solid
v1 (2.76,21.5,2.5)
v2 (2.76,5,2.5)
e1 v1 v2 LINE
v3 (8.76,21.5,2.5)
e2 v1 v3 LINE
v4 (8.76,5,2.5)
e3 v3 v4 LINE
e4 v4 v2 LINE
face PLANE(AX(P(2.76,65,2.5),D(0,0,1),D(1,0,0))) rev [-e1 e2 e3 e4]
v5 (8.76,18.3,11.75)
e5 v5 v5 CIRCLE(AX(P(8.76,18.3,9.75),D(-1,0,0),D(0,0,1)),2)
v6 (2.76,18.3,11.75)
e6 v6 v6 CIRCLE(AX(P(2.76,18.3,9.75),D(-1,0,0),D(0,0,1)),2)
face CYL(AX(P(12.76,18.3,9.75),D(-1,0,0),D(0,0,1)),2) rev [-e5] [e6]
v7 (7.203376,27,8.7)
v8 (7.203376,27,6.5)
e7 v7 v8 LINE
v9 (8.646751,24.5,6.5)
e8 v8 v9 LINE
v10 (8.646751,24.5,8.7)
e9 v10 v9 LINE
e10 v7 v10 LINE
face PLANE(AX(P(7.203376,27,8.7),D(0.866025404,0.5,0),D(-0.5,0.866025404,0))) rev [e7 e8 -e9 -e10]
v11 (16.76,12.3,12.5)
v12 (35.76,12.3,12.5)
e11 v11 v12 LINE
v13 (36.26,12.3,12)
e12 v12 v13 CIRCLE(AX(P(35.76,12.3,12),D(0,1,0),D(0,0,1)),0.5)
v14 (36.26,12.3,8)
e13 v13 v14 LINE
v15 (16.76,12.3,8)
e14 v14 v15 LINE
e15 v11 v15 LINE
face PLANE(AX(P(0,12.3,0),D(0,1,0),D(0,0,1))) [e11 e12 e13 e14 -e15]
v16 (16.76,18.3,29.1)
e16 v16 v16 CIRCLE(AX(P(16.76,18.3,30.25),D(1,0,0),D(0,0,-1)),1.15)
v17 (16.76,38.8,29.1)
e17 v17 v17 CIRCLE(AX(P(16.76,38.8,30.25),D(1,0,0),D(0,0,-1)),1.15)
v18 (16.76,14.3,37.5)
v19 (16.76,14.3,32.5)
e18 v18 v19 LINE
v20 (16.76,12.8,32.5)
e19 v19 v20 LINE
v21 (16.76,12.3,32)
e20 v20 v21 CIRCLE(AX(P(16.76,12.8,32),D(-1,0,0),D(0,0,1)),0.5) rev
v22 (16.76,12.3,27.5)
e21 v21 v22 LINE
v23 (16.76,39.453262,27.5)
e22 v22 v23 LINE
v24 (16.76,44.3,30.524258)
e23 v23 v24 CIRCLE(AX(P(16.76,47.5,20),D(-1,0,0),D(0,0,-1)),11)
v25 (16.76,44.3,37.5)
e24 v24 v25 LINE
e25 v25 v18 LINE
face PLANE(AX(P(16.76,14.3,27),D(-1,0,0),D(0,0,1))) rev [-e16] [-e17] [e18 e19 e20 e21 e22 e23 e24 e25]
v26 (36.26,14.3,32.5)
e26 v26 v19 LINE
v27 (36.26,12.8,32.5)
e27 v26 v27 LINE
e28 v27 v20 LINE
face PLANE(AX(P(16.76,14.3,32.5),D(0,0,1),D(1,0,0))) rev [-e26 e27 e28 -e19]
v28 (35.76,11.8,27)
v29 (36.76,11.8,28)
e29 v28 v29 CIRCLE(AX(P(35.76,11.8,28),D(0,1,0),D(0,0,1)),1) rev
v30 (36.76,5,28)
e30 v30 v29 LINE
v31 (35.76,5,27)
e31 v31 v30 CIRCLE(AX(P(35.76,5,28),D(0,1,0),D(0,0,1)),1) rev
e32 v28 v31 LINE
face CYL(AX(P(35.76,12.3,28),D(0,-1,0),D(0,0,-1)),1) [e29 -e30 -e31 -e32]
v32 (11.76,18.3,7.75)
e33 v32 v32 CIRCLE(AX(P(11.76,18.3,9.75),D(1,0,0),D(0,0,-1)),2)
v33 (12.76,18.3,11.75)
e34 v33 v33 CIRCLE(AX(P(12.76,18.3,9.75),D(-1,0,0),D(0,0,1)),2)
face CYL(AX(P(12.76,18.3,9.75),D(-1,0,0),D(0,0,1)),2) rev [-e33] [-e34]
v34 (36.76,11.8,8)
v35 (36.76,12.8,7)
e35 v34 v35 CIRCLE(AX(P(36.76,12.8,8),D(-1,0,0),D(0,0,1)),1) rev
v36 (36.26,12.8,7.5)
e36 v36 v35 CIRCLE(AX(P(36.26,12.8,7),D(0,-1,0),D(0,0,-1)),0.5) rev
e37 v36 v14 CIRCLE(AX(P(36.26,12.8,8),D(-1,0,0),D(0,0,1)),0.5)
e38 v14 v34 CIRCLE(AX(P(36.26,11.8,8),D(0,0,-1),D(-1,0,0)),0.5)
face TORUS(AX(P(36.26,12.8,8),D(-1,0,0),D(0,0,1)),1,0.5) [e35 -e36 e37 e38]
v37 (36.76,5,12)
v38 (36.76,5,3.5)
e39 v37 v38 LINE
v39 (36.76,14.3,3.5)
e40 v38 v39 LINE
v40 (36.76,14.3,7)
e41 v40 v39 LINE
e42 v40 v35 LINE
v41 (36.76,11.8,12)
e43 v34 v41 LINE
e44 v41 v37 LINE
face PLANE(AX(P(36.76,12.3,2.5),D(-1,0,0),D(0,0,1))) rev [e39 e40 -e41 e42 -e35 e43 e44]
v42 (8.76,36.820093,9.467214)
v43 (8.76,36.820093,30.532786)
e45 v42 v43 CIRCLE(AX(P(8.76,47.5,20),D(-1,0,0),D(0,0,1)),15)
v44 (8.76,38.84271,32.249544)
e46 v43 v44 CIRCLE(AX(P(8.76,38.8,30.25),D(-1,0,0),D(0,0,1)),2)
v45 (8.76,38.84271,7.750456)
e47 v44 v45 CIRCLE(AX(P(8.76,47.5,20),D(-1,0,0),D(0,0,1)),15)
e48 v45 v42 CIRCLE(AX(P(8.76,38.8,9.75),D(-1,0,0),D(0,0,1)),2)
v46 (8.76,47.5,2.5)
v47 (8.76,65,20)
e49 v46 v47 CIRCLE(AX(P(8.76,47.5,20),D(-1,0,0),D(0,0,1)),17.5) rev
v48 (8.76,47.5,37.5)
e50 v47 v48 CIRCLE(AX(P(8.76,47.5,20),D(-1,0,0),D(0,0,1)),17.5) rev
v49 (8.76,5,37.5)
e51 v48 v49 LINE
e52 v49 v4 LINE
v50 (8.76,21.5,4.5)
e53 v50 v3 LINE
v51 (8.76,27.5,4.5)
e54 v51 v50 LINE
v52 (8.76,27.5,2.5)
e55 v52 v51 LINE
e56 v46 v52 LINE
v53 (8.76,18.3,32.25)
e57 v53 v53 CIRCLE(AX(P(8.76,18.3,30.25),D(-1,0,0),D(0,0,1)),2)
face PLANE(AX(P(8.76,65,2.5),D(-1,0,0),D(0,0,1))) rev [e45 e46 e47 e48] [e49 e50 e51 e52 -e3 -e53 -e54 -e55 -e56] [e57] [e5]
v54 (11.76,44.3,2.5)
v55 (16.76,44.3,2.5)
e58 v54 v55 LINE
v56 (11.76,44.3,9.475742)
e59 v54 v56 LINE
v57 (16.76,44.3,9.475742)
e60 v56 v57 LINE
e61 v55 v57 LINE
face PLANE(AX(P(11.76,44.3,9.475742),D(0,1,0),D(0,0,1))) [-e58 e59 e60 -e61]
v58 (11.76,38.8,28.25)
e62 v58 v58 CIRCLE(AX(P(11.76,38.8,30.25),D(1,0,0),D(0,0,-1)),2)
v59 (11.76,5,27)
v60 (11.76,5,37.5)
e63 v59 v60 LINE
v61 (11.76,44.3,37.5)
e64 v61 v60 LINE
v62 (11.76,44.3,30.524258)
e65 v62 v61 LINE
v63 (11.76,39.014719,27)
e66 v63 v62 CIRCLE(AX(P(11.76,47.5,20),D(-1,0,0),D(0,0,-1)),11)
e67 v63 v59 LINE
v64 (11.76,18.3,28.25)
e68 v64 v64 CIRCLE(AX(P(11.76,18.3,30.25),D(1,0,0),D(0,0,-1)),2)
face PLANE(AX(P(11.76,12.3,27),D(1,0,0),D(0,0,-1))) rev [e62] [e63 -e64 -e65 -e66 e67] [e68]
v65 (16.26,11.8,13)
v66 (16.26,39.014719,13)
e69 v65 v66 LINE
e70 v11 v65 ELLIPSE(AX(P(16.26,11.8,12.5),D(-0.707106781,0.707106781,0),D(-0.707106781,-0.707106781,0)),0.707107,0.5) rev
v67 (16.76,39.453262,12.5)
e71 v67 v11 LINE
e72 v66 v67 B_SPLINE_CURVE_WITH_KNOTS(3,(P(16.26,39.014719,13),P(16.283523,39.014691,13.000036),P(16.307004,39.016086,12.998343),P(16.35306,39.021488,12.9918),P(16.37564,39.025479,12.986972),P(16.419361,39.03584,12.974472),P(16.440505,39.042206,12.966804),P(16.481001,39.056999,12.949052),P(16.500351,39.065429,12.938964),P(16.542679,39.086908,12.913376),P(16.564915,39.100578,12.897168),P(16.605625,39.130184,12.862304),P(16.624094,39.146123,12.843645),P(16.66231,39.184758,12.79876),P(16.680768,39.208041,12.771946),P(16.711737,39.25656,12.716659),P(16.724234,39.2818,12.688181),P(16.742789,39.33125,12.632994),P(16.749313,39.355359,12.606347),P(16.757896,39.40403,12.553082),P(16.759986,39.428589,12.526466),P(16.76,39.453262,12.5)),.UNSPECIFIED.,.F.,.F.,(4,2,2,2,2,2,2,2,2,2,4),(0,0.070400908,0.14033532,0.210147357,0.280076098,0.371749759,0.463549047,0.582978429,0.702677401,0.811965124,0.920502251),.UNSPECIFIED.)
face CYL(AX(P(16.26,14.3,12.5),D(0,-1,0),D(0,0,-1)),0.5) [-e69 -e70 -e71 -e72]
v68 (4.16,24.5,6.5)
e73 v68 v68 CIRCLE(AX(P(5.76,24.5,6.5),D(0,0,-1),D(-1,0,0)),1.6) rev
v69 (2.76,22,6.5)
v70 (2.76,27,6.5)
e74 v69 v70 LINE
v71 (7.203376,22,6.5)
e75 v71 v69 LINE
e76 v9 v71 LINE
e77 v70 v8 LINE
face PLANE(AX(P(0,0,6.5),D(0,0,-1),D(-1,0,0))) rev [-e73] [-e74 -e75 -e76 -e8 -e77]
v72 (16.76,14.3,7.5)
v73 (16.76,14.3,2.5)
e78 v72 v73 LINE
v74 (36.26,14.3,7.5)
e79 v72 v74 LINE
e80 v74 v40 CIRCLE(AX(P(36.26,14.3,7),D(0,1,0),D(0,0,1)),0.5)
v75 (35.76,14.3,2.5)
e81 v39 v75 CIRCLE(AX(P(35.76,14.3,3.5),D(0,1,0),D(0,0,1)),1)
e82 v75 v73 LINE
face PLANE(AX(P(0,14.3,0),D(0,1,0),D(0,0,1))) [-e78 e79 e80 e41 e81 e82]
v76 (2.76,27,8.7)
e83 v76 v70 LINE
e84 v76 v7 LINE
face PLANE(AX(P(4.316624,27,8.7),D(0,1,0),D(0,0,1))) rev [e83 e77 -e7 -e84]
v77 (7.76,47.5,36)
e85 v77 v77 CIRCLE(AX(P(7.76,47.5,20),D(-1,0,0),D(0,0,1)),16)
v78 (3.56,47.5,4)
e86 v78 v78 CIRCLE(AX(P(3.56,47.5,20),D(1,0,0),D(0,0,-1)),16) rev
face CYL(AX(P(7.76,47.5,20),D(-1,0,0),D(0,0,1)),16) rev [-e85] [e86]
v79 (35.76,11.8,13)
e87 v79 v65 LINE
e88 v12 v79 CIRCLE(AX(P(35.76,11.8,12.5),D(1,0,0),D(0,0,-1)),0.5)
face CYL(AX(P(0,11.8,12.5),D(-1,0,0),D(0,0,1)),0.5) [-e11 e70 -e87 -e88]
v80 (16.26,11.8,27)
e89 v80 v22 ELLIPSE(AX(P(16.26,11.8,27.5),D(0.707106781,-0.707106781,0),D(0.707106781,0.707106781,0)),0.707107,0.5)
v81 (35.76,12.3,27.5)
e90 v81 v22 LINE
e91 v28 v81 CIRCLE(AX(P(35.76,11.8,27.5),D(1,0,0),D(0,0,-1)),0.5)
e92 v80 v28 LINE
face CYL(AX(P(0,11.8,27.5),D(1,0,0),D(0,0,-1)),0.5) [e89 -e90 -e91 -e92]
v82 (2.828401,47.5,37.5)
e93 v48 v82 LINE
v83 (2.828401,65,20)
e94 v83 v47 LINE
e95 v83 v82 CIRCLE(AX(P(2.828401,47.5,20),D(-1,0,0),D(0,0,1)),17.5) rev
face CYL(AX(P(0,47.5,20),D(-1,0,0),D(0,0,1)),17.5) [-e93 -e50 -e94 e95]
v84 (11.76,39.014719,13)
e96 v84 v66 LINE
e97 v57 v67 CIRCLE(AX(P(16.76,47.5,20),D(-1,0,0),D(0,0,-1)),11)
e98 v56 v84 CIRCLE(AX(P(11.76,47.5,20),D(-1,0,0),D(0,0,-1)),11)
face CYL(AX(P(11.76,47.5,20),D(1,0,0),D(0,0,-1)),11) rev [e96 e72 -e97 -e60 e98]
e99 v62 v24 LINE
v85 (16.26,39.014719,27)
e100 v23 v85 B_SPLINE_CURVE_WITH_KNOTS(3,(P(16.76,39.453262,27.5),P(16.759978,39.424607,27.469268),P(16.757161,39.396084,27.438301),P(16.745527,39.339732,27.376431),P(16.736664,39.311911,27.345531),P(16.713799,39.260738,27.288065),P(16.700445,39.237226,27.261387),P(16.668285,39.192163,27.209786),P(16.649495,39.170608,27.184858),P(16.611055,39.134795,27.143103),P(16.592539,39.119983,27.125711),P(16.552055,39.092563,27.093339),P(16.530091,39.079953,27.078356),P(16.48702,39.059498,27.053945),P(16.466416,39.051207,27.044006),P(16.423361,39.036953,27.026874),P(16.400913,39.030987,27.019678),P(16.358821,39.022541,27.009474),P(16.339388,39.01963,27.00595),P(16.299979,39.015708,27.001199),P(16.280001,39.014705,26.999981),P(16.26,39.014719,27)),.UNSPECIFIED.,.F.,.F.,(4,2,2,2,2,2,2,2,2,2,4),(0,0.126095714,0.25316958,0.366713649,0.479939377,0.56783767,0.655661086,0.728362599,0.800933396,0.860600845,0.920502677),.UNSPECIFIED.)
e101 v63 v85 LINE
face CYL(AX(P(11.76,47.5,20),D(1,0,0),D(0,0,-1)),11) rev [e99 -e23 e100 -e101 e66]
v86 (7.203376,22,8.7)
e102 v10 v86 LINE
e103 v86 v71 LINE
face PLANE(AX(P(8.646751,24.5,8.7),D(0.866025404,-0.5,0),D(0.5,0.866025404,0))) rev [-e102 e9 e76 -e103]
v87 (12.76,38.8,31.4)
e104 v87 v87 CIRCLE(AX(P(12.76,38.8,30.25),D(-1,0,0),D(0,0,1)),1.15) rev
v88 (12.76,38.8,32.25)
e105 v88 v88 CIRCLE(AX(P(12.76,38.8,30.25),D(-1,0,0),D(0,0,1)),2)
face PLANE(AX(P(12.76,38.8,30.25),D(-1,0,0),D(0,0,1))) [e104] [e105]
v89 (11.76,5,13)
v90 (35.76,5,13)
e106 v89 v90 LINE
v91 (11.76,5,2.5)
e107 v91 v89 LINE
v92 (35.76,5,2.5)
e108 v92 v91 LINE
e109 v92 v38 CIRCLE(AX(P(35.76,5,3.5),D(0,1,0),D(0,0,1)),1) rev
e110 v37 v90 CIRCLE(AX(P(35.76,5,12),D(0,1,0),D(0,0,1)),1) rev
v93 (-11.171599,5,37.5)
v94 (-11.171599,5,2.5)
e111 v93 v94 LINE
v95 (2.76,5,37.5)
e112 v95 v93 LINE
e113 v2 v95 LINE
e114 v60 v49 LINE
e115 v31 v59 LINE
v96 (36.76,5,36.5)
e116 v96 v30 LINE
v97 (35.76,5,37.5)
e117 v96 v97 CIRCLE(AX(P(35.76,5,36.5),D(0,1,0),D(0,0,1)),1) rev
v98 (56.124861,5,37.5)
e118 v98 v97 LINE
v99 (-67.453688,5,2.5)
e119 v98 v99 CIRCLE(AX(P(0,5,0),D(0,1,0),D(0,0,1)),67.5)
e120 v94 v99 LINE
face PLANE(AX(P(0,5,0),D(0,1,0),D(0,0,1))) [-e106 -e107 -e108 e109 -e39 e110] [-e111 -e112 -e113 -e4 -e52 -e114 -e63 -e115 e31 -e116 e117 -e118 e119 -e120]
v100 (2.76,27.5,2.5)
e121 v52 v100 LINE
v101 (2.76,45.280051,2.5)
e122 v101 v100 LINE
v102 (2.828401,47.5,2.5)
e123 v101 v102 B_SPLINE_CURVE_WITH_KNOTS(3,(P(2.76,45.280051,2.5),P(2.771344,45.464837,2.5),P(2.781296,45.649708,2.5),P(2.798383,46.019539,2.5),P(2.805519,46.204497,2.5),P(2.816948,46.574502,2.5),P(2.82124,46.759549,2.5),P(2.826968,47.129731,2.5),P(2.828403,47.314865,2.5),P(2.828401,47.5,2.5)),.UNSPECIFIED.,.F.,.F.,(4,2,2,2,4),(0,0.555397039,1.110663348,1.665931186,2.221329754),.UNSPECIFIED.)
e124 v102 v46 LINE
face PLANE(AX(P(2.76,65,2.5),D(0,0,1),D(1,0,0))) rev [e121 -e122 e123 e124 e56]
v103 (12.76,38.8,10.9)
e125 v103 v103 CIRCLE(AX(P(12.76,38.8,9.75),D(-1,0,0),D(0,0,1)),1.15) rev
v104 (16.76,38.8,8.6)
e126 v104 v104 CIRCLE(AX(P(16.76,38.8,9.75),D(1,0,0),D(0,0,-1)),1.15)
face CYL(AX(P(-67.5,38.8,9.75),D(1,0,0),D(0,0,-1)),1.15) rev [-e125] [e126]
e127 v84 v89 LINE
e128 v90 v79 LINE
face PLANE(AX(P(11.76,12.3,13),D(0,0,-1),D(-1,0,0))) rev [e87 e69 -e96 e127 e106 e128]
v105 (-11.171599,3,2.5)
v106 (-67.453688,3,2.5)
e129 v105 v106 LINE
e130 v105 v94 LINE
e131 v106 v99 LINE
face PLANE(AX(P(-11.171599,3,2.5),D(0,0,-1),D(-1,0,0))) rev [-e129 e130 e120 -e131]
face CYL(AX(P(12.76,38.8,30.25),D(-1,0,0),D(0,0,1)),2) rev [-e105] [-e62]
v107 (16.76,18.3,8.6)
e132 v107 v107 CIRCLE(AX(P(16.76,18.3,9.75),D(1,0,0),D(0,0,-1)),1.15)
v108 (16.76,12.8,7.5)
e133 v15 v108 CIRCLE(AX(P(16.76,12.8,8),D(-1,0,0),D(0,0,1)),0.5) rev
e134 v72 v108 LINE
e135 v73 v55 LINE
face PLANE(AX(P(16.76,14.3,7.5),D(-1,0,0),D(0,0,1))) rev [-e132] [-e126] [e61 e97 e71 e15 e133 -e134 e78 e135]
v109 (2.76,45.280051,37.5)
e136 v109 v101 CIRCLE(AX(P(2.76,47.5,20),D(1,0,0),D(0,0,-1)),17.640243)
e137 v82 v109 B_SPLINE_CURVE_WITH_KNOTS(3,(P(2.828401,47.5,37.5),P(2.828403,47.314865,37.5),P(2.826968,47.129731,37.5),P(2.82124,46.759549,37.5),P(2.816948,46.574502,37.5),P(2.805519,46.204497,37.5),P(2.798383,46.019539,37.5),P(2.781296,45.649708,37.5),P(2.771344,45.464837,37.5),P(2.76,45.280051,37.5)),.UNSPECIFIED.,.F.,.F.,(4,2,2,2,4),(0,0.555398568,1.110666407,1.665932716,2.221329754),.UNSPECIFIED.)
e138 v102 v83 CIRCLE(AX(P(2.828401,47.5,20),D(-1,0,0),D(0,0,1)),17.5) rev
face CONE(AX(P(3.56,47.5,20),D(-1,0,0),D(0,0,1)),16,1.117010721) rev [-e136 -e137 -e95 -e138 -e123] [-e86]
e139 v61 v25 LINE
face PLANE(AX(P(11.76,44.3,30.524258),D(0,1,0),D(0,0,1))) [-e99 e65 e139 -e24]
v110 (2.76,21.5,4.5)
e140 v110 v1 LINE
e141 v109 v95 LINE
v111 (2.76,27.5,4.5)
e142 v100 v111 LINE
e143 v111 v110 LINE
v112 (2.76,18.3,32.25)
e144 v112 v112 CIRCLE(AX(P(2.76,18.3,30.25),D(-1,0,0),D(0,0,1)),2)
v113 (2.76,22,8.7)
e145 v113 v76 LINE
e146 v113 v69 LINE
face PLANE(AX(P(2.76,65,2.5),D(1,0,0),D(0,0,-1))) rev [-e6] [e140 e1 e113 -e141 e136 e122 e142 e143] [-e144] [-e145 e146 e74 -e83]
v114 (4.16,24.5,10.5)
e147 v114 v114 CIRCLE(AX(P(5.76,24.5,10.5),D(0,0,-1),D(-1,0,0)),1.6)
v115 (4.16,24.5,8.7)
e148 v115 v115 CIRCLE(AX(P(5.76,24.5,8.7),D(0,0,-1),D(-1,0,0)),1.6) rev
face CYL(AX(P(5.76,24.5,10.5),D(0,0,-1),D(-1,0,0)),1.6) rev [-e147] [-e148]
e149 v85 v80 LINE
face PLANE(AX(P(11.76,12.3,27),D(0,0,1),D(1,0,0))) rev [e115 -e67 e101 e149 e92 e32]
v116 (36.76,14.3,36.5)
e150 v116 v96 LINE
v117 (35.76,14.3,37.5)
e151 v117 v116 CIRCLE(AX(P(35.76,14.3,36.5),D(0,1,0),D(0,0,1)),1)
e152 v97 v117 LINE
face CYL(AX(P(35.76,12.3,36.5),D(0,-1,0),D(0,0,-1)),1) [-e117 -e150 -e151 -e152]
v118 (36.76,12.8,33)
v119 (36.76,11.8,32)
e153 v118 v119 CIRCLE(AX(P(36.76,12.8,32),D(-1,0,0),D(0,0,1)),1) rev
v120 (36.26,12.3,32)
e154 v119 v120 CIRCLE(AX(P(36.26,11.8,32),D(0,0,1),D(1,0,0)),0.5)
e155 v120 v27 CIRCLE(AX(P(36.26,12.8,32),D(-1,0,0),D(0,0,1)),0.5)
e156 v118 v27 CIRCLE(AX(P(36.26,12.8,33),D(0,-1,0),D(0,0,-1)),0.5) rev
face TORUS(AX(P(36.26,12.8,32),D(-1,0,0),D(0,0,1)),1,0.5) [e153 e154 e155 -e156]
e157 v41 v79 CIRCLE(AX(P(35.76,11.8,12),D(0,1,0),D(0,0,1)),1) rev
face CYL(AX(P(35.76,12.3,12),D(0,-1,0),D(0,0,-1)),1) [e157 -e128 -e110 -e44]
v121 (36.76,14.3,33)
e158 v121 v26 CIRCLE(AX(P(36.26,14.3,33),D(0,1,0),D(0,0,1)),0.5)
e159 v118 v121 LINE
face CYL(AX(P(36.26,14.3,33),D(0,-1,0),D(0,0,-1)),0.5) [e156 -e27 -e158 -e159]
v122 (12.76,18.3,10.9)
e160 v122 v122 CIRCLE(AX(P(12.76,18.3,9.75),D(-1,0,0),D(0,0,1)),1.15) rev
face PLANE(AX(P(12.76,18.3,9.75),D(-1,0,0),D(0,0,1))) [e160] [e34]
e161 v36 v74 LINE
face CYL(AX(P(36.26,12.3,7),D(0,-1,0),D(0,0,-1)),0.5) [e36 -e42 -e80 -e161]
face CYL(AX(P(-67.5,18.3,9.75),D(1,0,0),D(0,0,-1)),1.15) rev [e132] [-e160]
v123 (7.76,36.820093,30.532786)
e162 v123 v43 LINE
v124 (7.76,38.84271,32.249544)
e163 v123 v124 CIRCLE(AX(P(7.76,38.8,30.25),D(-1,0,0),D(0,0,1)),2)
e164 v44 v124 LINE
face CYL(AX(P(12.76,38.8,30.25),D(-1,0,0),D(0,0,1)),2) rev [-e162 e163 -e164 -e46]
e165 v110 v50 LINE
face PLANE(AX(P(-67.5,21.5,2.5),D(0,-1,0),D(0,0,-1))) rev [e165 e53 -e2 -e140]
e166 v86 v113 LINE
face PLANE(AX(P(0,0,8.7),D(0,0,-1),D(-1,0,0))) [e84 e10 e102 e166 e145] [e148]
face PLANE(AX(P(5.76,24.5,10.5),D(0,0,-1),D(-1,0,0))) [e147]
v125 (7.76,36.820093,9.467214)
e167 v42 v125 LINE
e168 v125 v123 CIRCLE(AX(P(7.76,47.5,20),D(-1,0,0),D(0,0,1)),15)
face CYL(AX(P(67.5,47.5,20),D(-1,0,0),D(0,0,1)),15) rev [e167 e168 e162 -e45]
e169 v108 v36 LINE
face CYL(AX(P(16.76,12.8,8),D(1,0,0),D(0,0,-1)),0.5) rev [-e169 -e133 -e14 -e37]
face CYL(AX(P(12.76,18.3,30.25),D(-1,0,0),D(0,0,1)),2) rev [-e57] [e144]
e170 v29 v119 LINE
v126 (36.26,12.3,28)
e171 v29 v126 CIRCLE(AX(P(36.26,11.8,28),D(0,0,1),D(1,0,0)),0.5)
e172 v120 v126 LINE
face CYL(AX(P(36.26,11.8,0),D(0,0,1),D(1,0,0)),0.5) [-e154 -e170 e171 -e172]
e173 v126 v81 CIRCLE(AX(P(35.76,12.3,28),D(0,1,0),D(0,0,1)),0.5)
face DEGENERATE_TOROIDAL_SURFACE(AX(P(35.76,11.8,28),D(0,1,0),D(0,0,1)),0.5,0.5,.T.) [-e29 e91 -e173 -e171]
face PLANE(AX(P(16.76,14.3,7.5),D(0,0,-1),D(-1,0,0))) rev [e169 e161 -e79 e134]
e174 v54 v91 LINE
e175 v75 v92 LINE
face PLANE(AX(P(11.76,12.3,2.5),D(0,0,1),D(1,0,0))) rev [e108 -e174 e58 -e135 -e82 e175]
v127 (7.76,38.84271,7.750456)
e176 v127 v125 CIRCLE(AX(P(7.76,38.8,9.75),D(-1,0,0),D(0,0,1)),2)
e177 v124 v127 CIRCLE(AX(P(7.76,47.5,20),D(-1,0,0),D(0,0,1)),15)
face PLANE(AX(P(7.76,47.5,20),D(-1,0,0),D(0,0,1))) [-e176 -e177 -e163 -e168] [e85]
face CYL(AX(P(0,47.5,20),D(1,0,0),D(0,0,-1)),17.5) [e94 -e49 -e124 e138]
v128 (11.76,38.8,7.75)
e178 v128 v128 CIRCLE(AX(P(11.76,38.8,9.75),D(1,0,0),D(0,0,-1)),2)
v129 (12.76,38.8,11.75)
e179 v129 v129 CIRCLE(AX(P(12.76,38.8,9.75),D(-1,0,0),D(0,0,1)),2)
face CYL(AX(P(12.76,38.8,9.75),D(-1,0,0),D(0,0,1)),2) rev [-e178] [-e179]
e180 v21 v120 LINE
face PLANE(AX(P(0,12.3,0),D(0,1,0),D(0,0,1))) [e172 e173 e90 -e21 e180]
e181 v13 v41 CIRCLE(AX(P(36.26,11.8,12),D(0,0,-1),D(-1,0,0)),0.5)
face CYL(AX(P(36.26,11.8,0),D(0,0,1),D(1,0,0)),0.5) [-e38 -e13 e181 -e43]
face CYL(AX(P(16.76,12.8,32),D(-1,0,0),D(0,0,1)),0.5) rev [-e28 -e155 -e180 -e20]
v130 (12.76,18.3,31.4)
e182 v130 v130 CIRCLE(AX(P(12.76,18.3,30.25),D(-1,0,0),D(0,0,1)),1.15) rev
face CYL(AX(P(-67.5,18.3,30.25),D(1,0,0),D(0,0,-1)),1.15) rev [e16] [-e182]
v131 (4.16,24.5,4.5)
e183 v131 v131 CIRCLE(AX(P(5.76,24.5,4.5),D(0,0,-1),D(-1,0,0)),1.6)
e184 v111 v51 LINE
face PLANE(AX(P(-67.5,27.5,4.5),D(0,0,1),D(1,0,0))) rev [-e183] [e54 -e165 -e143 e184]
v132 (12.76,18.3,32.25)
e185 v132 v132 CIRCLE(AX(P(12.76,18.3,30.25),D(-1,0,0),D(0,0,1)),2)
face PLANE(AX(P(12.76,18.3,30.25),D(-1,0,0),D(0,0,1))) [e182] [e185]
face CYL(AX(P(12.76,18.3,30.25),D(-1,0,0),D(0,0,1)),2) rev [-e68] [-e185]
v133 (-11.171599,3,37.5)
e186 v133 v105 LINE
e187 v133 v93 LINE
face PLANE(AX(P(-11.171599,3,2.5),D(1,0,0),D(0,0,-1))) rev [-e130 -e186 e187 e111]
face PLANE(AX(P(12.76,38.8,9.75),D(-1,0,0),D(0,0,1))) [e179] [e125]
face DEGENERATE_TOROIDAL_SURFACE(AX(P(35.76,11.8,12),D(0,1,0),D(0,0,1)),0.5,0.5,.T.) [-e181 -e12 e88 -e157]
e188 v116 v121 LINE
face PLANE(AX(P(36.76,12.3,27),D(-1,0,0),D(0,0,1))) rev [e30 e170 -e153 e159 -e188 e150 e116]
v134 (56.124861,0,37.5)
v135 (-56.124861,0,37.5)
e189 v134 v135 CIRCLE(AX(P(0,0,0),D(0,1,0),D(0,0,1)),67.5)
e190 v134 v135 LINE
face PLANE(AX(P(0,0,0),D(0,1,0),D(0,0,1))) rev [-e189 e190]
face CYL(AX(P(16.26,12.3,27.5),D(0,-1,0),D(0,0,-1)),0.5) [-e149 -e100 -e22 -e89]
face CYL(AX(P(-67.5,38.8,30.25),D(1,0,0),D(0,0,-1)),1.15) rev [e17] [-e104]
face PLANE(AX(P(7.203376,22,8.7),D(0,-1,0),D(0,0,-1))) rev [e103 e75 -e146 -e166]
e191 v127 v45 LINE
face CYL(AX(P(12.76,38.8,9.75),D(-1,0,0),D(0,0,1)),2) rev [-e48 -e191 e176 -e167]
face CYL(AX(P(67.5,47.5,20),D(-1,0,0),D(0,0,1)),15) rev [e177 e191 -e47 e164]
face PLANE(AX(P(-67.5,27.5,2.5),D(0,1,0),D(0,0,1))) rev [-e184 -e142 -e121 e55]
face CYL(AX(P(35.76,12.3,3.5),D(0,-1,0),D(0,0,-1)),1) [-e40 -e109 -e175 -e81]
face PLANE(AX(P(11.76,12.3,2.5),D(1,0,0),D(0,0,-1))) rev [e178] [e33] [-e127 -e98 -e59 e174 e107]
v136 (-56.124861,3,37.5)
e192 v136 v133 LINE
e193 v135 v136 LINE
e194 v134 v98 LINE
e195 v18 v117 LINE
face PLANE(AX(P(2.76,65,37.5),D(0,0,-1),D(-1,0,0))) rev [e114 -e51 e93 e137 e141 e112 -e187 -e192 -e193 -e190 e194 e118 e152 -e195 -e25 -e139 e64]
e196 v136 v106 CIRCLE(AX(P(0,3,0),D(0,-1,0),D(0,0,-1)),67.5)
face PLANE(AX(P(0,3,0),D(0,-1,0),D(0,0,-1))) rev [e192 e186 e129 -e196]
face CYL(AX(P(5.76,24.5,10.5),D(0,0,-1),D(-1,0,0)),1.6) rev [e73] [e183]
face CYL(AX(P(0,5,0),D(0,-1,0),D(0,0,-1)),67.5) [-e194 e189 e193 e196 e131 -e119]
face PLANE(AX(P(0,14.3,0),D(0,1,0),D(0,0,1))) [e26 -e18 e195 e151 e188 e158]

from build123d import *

# Parameters (mm, degrees)
SKETCH_1_R           = 67.5
EXTRUDE_1_DEPTH      = 5
SKETCH_2_W           = 6
SKETCH_2_H           = 35
EXTRUDE_2_DEPTH      = 60
FILLET_1_R           = 17.5
SKETCH_3_R           = 16
CUT_EXTRUDE_1_DEPTH  = 5
CHAMFER_1_SIZE       = 1.640243073
CHAMFER_1_SIZE_2     = 0.8
SKETCH_4_R           = 15
CUT_EXTRUDE_2_DEPTH  = 121.188675061
SKETCH_6_W           = 2
SKETCH_6_H           = 6
CUT_EXTRUDE_3_DEPTH  = 121.817372977
SKETCH_8_R           = 1.6
CUT_EXTRUDE_5_DEPTH  = 6
CUT_EXTRUDE_START    = -2
CUT_EXTRUDE_8_DEPTH  = 2.2
SKETCH_11_W          = 25
SKETCH_11_H          = 10.5
EXTRUDE_4_DEPTH      = 7.3
EXTRUDE_5_DEPTH      = 2
FILLET_3_R           = 1
EXTRUDE_6_DEPTH      = 5
SKETCH_14_R          = 1.15
CUT_EXTRUDE_10_DEPTH = 127.019830237
FILLET_2_R           = 0.5
SKETCH_15_R          = 2
CUT_EXTRUDE_11_DEPTH = 10
SKETCH_16_W          = 56.328401117
SKETCH_16_H          = 65
CUT_EXTRUDE_12_DEPTH = 2
SKETCH_17_W          = 112.249721604
SKETCH_17_H          = 30
CUT_EXTRUDE_13_DEPTH = 113.749722891


# Some blends are built 0.0001 mm under size
with BuildPart() as part:
    # 스케치1 → 보스-돌출1 (new body)
    with BuildSketch(Plane(origin=(0, 0, 0), x_dir=(1, 0, 0), z_dir=(0, 1, 0))):
        with Locations(Location((0, 0, 0), (0, 0, 270))):
            Circle(SKETCH_1_R)
    extrude(amount=EXTRUDE_1_DEPTH)

    # 스케치2 → 보스-돌출2 (add)
    with BuildSketch(Plane(origin=(0, 5, 0), x_dir=(1, 0, 0), z_dir=(0, 1, 0))):
        with Locations((5.76, -20)):
            Rectangle(SKETCH_2_W, SKETCH_2_H)
    extrude(amount=EXTRUDE_2_DEPTH)

    # 필렛1
    fillet_1_edges = [part.edges().sort_by_distance(p)[0] for p in [
        (5.76, 65, 2.5),
        (5.76, 65, 37.5),
    ]]
    fillet(fillet_1_edges, radius=FILLET_1_R - 0.0001)  # a hair under: the kernel refuses the full size

    # 스케치3 → 컷-돌출1 (cut)
    with BuildSketch(Plane.ZY.offset(-2.76)):
        with Locations((20, 47.5)):
            Circle(SKETCH_3_R)
    extrude(amount=-CUT_EXTRUDE_1_DEPTH, mode=Mode.SUBTRACT)

    # 모따기1
    # the kernel refuses this chamfer: 1.640243073, 0.8 mm, written as the material it takes off along each edge
    with BuildSketch(Plane(origin=(2.76, 47.5, 20), x_dir=(0, 0, 1), z_dir=(0, -1, 0))) as chamfer_1_piece_1:
        Polygon((16 + CHAMFER_1_SIZE, 0), (16, -CHAMFER_1_SIZE_2), (16, 0), align=None)
    revolve(axis=Axis((2.76, 47.5, 20), (-1, 0, 0)), mode=Mode.SUBTRACT)

    # 스케치4 → 컷-돌출2 (cut, through all)
    with BuildSketch(Plane.ZY.offset(-7.76)):
        with Locations((20, 47.5)):
            Circle(SKETCH_4_R)
    extrude(amount=-CUT_EXTRUDE_2_DEPTH, mode=Mode.SUBTRACT)

    # 스케치6 → 컷-돌출3 (cut, through all)
    with BuildSketch(Plane(origin=(8.76, 0, 0), x_dir=(0, 0, -1), z_dir=(1, 0, 0))):
        with Locations((-3.5, 24.5)):
            Rectangle(SKETCH_6_W, SKETCH_6_H)
    extrude(amount=-CUT_EXTRUDE_3_DEPTH, mode=Mode.SUBTRACT)

    # 스케치8 → 컷-돌출5 (cut)
    with BuildSketch(Plane(origin=(0, 0, 4.5), x_dir=(-1, 0, 0), z_dir=(0, 0, -1))):
        with Locations((-5.76, 24.5)):
            Circle(SKETCH_8_R)
    extrude(amount=-CUT_EXTRUDE_5_DEPTH, mode=Mode.SUBTRACT)

    # 스케치9 → 컷-돌출8 (cut)
    with BuildSketch(Plane(origin=(0, 0, 4.5), x_dir=(-1, 0, 0), z_dir=(0, 0, -1)).offset(CUT_EXTRUDE_START)):
        Polygon((-4.316624327, 27), (-7.203375673, 27), (-8.646751346, 24.5), (-7.203375673, 22), (-4.316624327, 22), (-2.76, 22), (-2.76, 27), align=None)
    extrude(amount=-CUT_EXTRUDE_8_DEPTH, mode=Mode.SUBTRACT)

    # 스케치11 → 보스-돌출4 (add)
    with BuildSketch(Plane(origin=(0, 5, 0), x_dir=(1, 0, 0), z_dir=(0, 1, 0))):
        with Locations((24.26, -7.75)):
            Rectangle(SKETCH_11_W, SKETCH_11_H)
        with Locations((24.26, -32.25)):
            Rectangle(SKETCH_11_W, SKETCH_11_H)
    extrude(amount=EXTRUDE_4_DEPTH)

    # 스케치12 → 보스-돌출5 (add)
    with BuildSketch(Plane(origin=(0, 12.3, 0), x_dir=(1, 0, 0), z_dir=(0, 1, 0))):
        Polygon((16.76, -32.5), (36.76, -32.5), (36.76, -37.5), (11.76, -37.5), (11.76, -27), (16.76, -27), align=None)
        Polygon((11.76, -2.5), (36.76, -2.5), (36.76, -7.5), (16.76, -7.5), (16.76, -13), (11.76, -13), align=None)
    extrude(amount=EXTRUDE_5_DEPTH)

    # 필렛3
    fillet_3_edges = [part.edges().sort_by_distance(p)[0] for p in [
        (36.76, 9.65, 2.5),
        (36.76, 9.65, 37.5),
        (36.76, 8.65, 27),
        (36.76, 8.65, 13),
    ]]
    fillet(fillet_3_edges, radius=FILLET_3_R)

    # 스케치13 → 보스-돌출6 (add)
    with BuildSketch(Plane(origin=(16.76, 0, 0), x_dir=(0, 0, -1), z_dir=(1, 0, 0))):
        with BuildLine():
            Line((-27, 14.3), (-37.5, 14.3))
            Line((-37.5, 14.3), (-37.5, 44.3))
            Line((-37.5, 44.3), (-30.524257694, 44.3))
            ThreePointArc((-30.524257694, 44.3), (-29.151964364, 41.397414624), (-27, 39.014718626))
            Line((-27, 39.014718626), (-27, 14.3))
        make_face()
        with BuildLine():
            Line((-13, 14.3), (-2.5, 14.3))
            Line((-2.5, 14.3), (-2.5, 44.3))
            Line((-2.5, 44.3), (-9.475742306, 44.3))
            ThreePointArc((-9.475742306, 44.3), (-10.848035636, 41.397414624), (-13, 39.014718626))
            Line((-13, 39.014718626), (-13, 14.3))
        make_face()
    extrude(amount=-EXTRUDE_6_DEPTH)

    # 스케치14 → 컷-돌출10 (cut, through all)
    with BuildSketch(Plane(origin=(16.76, 0, 0), x_dir=(0, 0, -1), z_dir=(1, 0, 0))):
        with Locations((-30.25, 18.3)):
            Circle(SKETCH_14_R)
        with Locations((-9.75, 18.3)):
            Circle(SKETCH_14_R)
        with Locations((-9.75, 38.8)):
            Circle(SKETCH_14_R)
        with Locations((-30.25, 38.8)):
            Circle(SKETCH_14_R)
    extrude(amount=-CUT_EXTRUDE_10_DEPTH, mode=Mode.SUBTRACT)

    # 필렛2
    fillet_2_edges = [part.edges().sort_by_distance(p)[0] for p in [
        (26.26, 12.3, 13),
        (16.76, 25.657359313, 13),
        (26.76, 12.3, 7.5),
        (36.76, 13.3, 7.5),
        (36.76, 12.3, 30.25),
        (16.76, 25.657359313, 27),
        (26.76, 12.3, 32.5),
        (36.76, 13.3, 32.5),
        (26.26, 12.3, 27),
        (36.467106781, 12.3, 27.292893219),
        (36.76, 12.3, 9.75),
        (36.467106781, 12.3, 12.707106781),
    ]]
    fillet(fillet_2_edges, radius=FILLET_2_R)

    # 스케치15 → 컷-돌출11 (cut)
    with BuildSketch(Plane.ZY.offset(-2.76)):
        with Locations((9.75, 38.8)):
            Circle(SKETCH_15_R)
        with Locations((30.25, 38.8)):
            Circle(SKETCH_15_R)
        with Locations((9.75, 18.3)):
            Circle(SKETCH_15_R)
        with Locations((30.25, 18.3)):
            Circle(SKETCH_15_R)
    extrude(amount=-CUT_EXTRUDE_11_DEPTH, mode=Mode.SUBTRACT)

    # 스케치16 → 컷-돌출12 (cut)
    with BuildSketch(Plane(origin=(0, 5, 0), x_dir=(1, 0, 0), z_dir=(0, 1, 0))):
        with Locations((-39.335799442, -35)):
            Rectangle(SKETCH_16_W, SKETCH_16_H)
    extrude(amount=-CUT_EXTRUDE_12_DEPTH, mode=Mode.SUBTRACT)

    # 스케치17 → 컷-돌출13 (cut, through all)
    with BuildSketch(Plane(origin=(0, 5, 0), x_dir=(1, 0, 0), z_dir=(0, 1, 0))):
        with Locations((0, -52.5)):
            Rectangle(SKETCH_17_W, SKETCH_17_H)
    extrude(amount=-CUT_EXTRUDE_13_DEPTH, mode=Mode.SUBTRACT)


solid = part.part
